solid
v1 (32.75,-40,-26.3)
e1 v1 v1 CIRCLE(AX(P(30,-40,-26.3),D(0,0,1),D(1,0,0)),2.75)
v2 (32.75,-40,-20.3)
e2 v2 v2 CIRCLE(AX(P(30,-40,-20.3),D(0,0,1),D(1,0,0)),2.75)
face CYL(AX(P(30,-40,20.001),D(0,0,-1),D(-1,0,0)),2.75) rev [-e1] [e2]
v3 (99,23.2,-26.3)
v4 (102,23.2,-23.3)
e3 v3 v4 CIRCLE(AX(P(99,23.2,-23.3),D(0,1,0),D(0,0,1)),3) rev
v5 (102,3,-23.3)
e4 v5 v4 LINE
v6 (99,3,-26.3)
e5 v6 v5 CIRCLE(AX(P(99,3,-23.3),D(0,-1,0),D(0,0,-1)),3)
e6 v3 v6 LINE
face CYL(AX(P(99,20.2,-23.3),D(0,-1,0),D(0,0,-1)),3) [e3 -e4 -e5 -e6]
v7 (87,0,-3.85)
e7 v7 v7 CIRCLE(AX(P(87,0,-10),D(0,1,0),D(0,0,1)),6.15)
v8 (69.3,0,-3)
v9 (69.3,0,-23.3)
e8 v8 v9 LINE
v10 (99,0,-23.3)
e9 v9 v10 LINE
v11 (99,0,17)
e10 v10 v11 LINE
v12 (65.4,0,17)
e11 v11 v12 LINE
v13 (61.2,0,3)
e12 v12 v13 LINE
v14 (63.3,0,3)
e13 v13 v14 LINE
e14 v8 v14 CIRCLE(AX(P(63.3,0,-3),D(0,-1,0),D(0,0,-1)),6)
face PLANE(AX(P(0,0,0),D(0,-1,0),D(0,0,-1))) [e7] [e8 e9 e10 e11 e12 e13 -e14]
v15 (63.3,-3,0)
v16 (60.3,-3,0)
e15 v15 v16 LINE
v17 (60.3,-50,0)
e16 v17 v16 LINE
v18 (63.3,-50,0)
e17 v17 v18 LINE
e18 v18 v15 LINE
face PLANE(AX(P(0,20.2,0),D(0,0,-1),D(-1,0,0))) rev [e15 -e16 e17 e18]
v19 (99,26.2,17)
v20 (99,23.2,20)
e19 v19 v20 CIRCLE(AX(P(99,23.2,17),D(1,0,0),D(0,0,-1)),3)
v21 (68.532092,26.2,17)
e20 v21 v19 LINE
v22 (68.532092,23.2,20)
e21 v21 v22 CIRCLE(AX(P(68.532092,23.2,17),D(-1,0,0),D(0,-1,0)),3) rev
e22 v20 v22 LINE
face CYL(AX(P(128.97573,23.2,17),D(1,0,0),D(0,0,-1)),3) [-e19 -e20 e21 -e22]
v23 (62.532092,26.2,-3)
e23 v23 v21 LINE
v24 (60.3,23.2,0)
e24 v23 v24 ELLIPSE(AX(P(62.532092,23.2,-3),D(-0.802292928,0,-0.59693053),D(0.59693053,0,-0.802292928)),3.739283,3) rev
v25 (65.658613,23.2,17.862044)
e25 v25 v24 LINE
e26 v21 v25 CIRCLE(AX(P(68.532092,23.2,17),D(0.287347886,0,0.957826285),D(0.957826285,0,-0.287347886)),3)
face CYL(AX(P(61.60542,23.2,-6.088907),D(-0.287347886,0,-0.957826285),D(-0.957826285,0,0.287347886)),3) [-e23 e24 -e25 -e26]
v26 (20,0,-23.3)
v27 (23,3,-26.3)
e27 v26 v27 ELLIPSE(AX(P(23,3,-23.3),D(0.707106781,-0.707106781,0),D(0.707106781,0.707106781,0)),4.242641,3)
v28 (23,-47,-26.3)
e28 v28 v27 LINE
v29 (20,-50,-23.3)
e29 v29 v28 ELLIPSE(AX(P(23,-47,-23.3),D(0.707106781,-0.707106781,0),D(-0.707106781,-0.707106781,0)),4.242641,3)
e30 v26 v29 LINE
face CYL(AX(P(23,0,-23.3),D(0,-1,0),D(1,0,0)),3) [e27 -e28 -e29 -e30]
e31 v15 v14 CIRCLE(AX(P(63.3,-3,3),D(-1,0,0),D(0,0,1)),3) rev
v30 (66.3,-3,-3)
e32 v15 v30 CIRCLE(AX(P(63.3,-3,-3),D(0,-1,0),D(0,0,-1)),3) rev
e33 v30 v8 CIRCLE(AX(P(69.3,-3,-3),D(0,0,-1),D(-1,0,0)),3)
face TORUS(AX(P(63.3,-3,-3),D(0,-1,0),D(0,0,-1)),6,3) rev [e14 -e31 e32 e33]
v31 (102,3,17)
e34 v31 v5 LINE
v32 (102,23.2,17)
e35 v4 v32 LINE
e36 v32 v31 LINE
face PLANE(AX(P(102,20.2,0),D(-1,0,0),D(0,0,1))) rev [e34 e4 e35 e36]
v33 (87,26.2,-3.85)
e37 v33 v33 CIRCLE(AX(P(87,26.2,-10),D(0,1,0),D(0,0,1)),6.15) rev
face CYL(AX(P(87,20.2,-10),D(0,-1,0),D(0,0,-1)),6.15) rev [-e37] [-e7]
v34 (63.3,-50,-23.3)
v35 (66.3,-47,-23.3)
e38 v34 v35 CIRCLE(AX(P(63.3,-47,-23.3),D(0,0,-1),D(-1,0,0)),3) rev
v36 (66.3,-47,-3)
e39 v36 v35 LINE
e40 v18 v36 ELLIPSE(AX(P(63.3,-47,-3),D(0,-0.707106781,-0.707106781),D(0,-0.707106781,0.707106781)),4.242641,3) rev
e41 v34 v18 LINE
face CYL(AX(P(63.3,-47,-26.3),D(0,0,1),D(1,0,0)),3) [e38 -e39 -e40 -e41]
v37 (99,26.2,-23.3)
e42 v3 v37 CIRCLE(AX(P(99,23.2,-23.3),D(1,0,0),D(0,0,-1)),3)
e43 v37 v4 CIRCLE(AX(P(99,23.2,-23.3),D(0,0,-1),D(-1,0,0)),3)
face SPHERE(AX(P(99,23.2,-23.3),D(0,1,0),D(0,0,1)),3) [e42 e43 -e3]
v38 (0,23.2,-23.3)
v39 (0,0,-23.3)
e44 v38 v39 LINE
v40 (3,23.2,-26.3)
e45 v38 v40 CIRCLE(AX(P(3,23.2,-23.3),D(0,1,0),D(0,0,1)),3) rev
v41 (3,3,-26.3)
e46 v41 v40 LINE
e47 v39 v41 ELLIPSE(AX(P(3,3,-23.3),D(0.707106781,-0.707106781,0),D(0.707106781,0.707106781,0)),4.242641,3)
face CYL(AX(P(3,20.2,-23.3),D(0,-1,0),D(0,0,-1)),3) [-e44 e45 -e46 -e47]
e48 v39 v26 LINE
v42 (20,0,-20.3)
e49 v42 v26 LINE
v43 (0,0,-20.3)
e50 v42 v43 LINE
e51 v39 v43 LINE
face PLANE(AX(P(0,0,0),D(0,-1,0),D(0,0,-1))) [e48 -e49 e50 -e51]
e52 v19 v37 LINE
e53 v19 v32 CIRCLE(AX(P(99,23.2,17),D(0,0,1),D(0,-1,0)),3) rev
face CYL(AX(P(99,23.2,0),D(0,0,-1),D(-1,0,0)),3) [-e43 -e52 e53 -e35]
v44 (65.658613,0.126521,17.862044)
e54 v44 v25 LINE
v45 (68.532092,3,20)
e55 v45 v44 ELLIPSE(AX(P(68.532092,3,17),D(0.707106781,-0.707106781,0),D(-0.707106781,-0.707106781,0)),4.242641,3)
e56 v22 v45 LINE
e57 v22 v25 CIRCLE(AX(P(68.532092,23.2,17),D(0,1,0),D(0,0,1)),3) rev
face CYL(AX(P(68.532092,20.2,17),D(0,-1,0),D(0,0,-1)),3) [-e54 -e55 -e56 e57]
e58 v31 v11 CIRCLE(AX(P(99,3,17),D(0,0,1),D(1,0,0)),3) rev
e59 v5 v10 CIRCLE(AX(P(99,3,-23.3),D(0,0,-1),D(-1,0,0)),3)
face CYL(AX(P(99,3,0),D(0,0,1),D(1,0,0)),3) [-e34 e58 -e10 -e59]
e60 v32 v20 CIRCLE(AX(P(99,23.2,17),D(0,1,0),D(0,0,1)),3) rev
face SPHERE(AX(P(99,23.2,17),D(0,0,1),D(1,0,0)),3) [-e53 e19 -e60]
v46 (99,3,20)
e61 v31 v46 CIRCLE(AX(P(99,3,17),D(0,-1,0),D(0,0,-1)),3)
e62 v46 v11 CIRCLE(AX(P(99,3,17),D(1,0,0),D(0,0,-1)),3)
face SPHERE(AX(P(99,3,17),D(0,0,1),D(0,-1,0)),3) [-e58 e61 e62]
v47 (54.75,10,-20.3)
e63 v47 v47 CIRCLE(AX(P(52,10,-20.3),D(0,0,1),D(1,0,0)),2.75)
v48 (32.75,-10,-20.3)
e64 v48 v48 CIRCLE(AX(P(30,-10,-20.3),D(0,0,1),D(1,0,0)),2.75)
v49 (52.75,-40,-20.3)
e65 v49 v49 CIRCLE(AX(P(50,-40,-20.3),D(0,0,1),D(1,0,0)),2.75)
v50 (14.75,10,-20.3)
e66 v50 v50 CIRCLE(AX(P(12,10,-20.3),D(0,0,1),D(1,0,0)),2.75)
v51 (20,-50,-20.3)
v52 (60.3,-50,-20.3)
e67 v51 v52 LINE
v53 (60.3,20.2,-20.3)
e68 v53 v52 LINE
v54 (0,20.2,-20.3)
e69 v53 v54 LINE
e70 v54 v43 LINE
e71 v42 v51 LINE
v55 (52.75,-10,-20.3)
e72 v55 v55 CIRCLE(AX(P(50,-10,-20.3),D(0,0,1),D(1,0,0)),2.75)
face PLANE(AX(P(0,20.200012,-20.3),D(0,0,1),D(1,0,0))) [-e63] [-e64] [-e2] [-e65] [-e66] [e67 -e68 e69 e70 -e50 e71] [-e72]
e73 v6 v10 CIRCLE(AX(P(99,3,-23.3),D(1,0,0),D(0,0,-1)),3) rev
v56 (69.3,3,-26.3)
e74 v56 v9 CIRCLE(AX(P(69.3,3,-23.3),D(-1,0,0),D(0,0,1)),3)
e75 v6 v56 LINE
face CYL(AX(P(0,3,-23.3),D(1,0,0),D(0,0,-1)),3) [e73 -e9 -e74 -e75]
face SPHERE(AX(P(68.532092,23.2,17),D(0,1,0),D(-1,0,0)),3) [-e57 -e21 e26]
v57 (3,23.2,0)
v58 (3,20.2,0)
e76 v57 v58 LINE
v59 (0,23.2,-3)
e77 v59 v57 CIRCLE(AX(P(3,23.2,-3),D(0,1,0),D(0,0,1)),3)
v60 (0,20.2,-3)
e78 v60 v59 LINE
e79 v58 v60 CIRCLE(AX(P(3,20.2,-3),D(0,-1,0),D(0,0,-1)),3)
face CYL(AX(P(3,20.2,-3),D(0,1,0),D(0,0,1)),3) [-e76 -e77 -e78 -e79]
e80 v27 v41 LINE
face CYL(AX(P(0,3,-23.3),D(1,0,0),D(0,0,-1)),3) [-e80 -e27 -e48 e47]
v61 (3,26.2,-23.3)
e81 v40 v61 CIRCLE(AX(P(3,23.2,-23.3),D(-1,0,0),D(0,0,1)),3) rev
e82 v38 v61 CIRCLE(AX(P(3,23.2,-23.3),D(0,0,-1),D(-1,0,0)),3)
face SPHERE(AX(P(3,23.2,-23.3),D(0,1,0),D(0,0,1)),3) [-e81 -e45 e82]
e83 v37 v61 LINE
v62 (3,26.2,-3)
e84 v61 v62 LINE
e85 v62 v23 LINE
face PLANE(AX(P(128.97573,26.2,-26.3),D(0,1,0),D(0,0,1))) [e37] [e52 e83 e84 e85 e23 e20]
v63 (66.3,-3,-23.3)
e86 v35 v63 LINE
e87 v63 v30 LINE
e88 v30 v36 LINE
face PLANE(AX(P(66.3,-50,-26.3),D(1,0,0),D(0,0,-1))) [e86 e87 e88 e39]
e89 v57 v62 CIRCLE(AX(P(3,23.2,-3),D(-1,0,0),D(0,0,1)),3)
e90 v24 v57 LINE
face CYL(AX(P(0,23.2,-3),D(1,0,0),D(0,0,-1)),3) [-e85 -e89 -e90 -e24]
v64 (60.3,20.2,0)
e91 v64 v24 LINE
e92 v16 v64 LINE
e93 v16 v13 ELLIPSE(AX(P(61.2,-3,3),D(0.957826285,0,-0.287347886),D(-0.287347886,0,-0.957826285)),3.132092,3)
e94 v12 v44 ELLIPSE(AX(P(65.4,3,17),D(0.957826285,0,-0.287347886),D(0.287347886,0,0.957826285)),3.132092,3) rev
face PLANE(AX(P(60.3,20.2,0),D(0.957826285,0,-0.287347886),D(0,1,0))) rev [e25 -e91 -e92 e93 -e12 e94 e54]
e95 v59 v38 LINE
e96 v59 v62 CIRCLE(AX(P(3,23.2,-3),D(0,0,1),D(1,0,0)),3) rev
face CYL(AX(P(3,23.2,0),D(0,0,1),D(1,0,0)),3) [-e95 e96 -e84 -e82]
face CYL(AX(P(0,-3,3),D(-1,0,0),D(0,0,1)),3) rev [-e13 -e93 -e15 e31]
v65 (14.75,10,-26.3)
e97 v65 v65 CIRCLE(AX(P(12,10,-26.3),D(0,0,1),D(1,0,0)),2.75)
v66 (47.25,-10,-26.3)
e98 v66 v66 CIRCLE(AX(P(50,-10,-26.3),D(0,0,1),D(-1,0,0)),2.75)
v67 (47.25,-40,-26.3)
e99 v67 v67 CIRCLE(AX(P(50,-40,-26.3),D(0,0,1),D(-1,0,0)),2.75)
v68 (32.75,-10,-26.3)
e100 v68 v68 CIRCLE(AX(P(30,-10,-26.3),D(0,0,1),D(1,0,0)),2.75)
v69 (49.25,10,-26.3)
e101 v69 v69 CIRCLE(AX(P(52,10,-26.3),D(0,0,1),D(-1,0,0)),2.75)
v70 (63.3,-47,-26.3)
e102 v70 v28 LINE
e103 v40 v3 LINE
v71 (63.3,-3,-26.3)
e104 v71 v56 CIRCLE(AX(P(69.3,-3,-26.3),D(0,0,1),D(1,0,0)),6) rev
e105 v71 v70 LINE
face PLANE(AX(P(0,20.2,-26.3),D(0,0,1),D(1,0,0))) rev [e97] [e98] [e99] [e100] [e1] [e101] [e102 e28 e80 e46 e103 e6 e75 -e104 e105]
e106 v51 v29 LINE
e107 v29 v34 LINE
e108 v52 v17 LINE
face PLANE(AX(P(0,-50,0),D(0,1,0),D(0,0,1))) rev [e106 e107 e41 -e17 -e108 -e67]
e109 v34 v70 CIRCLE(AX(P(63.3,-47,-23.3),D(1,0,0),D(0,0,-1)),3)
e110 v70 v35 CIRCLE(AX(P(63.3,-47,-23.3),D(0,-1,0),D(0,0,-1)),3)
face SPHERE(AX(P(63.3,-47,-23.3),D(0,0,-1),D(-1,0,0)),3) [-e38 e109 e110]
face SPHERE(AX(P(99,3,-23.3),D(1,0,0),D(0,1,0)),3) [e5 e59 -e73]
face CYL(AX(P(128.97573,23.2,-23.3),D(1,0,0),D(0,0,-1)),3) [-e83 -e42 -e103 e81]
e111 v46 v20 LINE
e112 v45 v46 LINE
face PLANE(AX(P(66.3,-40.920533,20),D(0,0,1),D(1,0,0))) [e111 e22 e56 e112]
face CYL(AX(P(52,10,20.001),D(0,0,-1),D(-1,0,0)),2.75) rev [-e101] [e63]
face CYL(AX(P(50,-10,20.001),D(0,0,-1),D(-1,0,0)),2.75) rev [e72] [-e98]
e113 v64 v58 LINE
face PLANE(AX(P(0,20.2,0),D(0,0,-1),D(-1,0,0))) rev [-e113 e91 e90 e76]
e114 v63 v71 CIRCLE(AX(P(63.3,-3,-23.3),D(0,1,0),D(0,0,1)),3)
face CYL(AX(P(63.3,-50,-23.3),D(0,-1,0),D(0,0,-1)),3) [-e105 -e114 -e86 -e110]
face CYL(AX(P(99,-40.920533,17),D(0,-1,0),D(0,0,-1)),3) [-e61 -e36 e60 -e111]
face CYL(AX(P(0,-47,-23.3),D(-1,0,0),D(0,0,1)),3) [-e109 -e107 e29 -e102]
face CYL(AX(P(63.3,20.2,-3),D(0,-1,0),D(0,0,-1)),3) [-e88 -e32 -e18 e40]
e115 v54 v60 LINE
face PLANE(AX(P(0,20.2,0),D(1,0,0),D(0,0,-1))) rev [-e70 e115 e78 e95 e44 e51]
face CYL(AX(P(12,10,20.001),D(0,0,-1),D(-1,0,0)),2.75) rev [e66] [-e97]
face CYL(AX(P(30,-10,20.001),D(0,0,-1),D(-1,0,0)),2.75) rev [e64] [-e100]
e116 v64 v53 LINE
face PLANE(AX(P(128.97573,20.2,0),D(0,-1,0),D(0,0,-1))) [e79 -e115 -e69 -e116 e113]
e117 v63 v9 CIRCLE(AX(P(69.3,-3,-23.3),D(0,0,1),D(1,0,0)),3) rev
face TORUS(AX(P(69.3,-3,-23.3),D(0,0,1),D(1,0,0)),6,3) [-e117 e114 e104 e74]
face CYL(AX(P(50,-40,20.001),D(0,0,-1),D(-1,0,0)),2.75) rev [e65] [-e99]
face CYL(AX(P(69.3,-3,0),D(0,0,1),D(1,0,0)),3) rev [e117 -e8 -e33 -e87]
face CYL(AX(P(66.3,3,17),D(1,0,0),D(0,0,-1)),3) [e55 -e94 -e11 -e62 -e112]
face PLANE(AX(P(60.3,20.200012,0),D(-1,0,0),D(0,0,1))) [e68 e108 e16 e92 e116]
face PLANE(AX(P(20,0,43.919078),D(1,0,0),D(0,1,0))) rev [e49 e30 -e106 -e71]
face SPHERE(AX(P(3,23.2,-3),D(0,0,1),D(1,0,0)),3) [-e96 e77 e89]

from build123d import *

# Parameters (mm, degrees)
SKETCH1_W                            = 102
SKETCH1_H                            = 26.3
SKETCH1_R                            = 6.15
BASE_DEPTH                           = 20.2
BACKSIDE_SURFACE_1_REACH             = 109.255
SKETCH2_W                            = 60.3
SKETCH2_H                            = 20.3
BACKSIDE_SURFACE_1_DIRECTION_2_DEPTH = 108.255442752
SKETCH4_W                            = 6
SKETCH4_H                            = 26.3
LEG_DEPTH                            = 50
SKETCH5_W                            = 26.3
SKETCH5_H                            = 6
ROOF_DEPTH                           = 102
SKETCH6_R                            = 6.15
HOLE_FOR_LINEAR_ROD_DEPTH            = 26.2
SKETCH9_W                            = 35.7
SKETCH9_H                            = 20
BOSS_EXTRUDE5_DEPTH                  = 26.2
SKETCH7_W                            = 40.3
SKETCH7_H                            = 50
BACKSIDE_SURFACE_2_DEPTH             = 6
BOLT_HOLES_REACH                     = 124.669
SKETCH3_R                            = 2.75
CHAMFER1_SIZE                        = 6
CHAMFER1_SIZE_2                      = 20
FILLET1_R                            = 3


with BuildPart() as part:
    # Sketch1 → base (new body)
    with BuildSketch(Plane(origin=(0, 0, 0), x_dir=(1, 0, 0), z_dir=(0, 1, 0))):
        with Locations((51, 13.15)):
            Rectangle(SKETCH1_W, SKETCH1_H)
        with Locations(Location((87, 10, 0), (0, 0, 270))):
            Circle(SKETCH1_R, mode=Mode.SUBTRACT)
    extrude(amount=BASE_DEPTH)

    # Sketch2 → backside surface 1 (cut, up to next)
    with BuildSketch(Plane(origin=(0, 20.2, 0), x_dir=(1, 0, 0), z_dir=(0, 1, 0)), mode=Mode.PRIVATE) as backside_surface_1_sk1:
        with Locations((30.15, 10.15)):
            Rectangle(SKETCH2_W, SKETCH2_H)
    backside_surface_1_tool1 = extrude(backside_surface_1_sk1.sketch, amount=-BACKSIDE_SURFACE_1_REACH, mode=Mode.PRIVATE) & part.part
    add(backside_surface_1_tool1.solids().sort_by_distance((30.15, 20.2, -10.15))[0], mode=Mode.SUBTRACT)

    # Sketch2 → backside surface 1 direction 2 (cut)
    with BuildSketch(Plane(origin=(0, 20.2, 0), x_dir=(1, 0, 0), z_dir=(0, 1, 0))):
        with Locations((30.15, 10.15)):
            Rectangle(SKETCH2_W, SKETCH2_H)
    extrude(amount=BACKSIDE_SURFACE_1_DIRECTION_2_DEPTH, mode=Mode.SUBTRACT)

    # Sketch4 → leg (add)
    with BuildSketch(Plane(origin=(0, 0, 0), x_dir=(1, 0, 0), z_dir=(0, 1, 0))):
        with Locations((63.3, 13.15)):
            Rectangle(SKETCH4_W, SKETCH4_H)
    extrude(amount=-LEG_DEPTH)

    # Sketch5 → roof (add)
    with BuildSketch(Plane.ZY):
        with Locations((-13.15, 23.2)):
            Rectangle(SKETCH5_W, SKETCH5_H)
    extrude(amount=-ROOF_DEPTH)

    # Sketch6 → hole for linear rod (cut)
    with BuildSketch(Plane.XZ):
        with Locations(Location((87, -10, 0), (0, 0, 90))):
            Circle(SKETCH6_R)
    extrude(amount=-HOLE_FOR_LINEAR_ROD_DEPTH, mode=Mode.SUBTRACT)

    # Sketch9 → Boss-Extrude5 (add)
    with BuildSketch(Plane(origin=(0, 26.2, 0), x_dir=(1, 0, 0), z_dir=(0, 1, 0))):
        with Locations((84.15, -10)):
            Rectangle(SKETCH9_W, SKETCH9_H)
    extrude(amount=-BOSS_EXTRUDE5_DEPTH)

    # Sketch7 → backside surface 2 (add)
    with BuildSketch(Plane.XY.offset(-26.3)):
        with Locations((40.15, -25)):
            Rectangle(SKETCH7_W, SKETCH7_H)
    extrude(amount=BACKSIDE_SURFACE_2_DEPTH)

    # Sketch3 → bolt holes (cut, up to next)
    with BuildSketch(Plane.XY.offset(-26.3), mode=Mode.PRIVATE) as bolt_holes_sk1:
        with Locations((12, 10)):
            Circle(SKETCH3_R)
    bolt_holes_tool1 = extrude(bolt_holes_sk1.sketch, amount=BOLT_HOLES_REACH, mode=Mode.PRIVATE) & part.part
    # Sketch3 → bolt holes (cut, up to next)
    with BuildSketch(Plane.XY.offset(-26.3), mode=Mode.PRIVATE) as bolt_holes_sk2:
        with Locations(Location((52, 10, 0), (0, 0, 180))):
            Circle(SKETCH3_R)
    bolt_holes_tool2 = extrude(bolt_holes_sk2.sketch, amount=BOLT_HOLES_REACH, mode=Mode.PRIVATE) & part.part
    # Sketch3 → bolt holes (cut, up to next)
    with BuildSketch(Plane.XY.offset(-26.3), mode=Mode.PRIVATE) as bolt_holes_sk3:
        with Locations((30, -10)):
            Circle(SKETCH3_R)
    bolt_holes_tool3 = extrude(bolt_holes_sk3.sketch, amount=BOLT_HOLES_REACH, mode=Mode.PRIVATE) & part.part
    # Sketch3 → bolt holes (cut, up to next)
    with BuildSketch(Plane.XY.offset(-26.3), mode=Mode.PRIVATE) as bolt_holes_sk4:
        with Locations((30, -40)):
            Circle(SKETCH3_R)
    bolt_holes_tool4 = extrude(bolt_holes_sk4.sketch, amount=BOLT_HOLES_REACH, mode=Mode.PRIVATE) & part.part
    # Sketch3 → bolt holes (cut, up to next)
    with BuildSketch(Plane.XY.offset(-26.3), mode=Mode.PRIVATE) as bolt_holes_sk5:
        with Locations(Location((50, -40, 0), (0, 0, 180))):
            Circle(SKETCH3_R)
    bolt_holes_tool5 = extrude(bolt_holes_sk5.sketch, amount=BOLT_HOLES_REACH, mode=Mode.PRIVATE) & part.part
    # Sketch3 → bolt holes (cut, up to next)
    with BuildSketch(Plane.XY.offset(-26.3), mode=Mode.PRIVATE) as bolt_holes_sk6:
        with Locations(Location((50, -10, 0), (0, 0, 180))):
            Circle(SKETCH3_R)
    bolt_holes_tool6 = extrude(bolt_holes_sk6.sketch, amount=BOLT_HOLES_REACH, mode=Mode.PRIVATE) & part.part
    add(bolt_holes_tool1.solids().sort_by_distance((12, 10, -26.3))[0], mode=Mode.SUBTRACT)
    add(bolt_holes_tool2.solids().sort_by_distance((52, 10, -26.3))[0], mode=Mode.SUBTRACT)
    add(bolt_holes_tool3.solids().sort_by_distance((30, -10, -26.3))[0], mode=Mode.SUBTRACT)
    add(bolt_holes_tool4.solids().sort_by_distance((30, -40, -26.3))[0], mode=Mode.SUBTRACT)
    add(bolt_holes_tool5.solids().sort_by_distance((50, -40, -26.3))[0], mode=Mode.SUBTRACT)
    add(bolt_holes_tool6.solids().sort_by_distance((50, -10, -26.3))[0], mode=Mode.SUBTRACT)

    # Chamfer1
    # the kernel refuses this chamfer: 20, 6 mm, written as the material it adds along each edge
    with BuildSketch(Plane(origin=(66.3, 26.2, 0), x_dir=(-0.9925205348140392, 0, -0.12207779475585914), z_dir=(0, -1, 0))) as chamfer1_piece_1:
        Polygon((CHAMFER1_SIZE * 0.992520534814, -CHAMFER1_SIZE * 0.122077794756), (-CHAMFER1_SIZE_2 * 0.122077794756, -CHAMFER1_SIZE_2 * 0.992520534814), (0, 0), align=None)
    extrude(amount=26.2)

    # Fillet1
    fillet1_edges = [part.edges().sort_by_distance(p)[0] for p in [
        (30.15, 26.2, 0),
        (63.3, 0, 0),
        (63.3, 26.2, 10),
        (43.15, -50, -26.3),
        (66.3, -50, -13.15),
        (66.3, -25, -26.3),
        (66.3, -25, 0),
        (66.3, 0, -13.15),
        (84.15, 0, -26.3),
        (102, 0, -3.15),
        (51, 26.2, -26.3),
        (0, 23.2, 0),
        (0, 26.2, -13.15),
        (102, 26.2, -3.15),
        (84.15, 26.2, 20),
        (84.15, 0, 20),
        (102, 13.1, 20),
        (66.3, 13.1, 20),
        (0, 13.1, -26.3),
        (102, 13.1, -26.3),
        (10, 0, -26.3),
        (20, -25, -26.3),
    ]]
    fillet(fillet1_edges, radius=FILLET1_R)


solid = part.part
